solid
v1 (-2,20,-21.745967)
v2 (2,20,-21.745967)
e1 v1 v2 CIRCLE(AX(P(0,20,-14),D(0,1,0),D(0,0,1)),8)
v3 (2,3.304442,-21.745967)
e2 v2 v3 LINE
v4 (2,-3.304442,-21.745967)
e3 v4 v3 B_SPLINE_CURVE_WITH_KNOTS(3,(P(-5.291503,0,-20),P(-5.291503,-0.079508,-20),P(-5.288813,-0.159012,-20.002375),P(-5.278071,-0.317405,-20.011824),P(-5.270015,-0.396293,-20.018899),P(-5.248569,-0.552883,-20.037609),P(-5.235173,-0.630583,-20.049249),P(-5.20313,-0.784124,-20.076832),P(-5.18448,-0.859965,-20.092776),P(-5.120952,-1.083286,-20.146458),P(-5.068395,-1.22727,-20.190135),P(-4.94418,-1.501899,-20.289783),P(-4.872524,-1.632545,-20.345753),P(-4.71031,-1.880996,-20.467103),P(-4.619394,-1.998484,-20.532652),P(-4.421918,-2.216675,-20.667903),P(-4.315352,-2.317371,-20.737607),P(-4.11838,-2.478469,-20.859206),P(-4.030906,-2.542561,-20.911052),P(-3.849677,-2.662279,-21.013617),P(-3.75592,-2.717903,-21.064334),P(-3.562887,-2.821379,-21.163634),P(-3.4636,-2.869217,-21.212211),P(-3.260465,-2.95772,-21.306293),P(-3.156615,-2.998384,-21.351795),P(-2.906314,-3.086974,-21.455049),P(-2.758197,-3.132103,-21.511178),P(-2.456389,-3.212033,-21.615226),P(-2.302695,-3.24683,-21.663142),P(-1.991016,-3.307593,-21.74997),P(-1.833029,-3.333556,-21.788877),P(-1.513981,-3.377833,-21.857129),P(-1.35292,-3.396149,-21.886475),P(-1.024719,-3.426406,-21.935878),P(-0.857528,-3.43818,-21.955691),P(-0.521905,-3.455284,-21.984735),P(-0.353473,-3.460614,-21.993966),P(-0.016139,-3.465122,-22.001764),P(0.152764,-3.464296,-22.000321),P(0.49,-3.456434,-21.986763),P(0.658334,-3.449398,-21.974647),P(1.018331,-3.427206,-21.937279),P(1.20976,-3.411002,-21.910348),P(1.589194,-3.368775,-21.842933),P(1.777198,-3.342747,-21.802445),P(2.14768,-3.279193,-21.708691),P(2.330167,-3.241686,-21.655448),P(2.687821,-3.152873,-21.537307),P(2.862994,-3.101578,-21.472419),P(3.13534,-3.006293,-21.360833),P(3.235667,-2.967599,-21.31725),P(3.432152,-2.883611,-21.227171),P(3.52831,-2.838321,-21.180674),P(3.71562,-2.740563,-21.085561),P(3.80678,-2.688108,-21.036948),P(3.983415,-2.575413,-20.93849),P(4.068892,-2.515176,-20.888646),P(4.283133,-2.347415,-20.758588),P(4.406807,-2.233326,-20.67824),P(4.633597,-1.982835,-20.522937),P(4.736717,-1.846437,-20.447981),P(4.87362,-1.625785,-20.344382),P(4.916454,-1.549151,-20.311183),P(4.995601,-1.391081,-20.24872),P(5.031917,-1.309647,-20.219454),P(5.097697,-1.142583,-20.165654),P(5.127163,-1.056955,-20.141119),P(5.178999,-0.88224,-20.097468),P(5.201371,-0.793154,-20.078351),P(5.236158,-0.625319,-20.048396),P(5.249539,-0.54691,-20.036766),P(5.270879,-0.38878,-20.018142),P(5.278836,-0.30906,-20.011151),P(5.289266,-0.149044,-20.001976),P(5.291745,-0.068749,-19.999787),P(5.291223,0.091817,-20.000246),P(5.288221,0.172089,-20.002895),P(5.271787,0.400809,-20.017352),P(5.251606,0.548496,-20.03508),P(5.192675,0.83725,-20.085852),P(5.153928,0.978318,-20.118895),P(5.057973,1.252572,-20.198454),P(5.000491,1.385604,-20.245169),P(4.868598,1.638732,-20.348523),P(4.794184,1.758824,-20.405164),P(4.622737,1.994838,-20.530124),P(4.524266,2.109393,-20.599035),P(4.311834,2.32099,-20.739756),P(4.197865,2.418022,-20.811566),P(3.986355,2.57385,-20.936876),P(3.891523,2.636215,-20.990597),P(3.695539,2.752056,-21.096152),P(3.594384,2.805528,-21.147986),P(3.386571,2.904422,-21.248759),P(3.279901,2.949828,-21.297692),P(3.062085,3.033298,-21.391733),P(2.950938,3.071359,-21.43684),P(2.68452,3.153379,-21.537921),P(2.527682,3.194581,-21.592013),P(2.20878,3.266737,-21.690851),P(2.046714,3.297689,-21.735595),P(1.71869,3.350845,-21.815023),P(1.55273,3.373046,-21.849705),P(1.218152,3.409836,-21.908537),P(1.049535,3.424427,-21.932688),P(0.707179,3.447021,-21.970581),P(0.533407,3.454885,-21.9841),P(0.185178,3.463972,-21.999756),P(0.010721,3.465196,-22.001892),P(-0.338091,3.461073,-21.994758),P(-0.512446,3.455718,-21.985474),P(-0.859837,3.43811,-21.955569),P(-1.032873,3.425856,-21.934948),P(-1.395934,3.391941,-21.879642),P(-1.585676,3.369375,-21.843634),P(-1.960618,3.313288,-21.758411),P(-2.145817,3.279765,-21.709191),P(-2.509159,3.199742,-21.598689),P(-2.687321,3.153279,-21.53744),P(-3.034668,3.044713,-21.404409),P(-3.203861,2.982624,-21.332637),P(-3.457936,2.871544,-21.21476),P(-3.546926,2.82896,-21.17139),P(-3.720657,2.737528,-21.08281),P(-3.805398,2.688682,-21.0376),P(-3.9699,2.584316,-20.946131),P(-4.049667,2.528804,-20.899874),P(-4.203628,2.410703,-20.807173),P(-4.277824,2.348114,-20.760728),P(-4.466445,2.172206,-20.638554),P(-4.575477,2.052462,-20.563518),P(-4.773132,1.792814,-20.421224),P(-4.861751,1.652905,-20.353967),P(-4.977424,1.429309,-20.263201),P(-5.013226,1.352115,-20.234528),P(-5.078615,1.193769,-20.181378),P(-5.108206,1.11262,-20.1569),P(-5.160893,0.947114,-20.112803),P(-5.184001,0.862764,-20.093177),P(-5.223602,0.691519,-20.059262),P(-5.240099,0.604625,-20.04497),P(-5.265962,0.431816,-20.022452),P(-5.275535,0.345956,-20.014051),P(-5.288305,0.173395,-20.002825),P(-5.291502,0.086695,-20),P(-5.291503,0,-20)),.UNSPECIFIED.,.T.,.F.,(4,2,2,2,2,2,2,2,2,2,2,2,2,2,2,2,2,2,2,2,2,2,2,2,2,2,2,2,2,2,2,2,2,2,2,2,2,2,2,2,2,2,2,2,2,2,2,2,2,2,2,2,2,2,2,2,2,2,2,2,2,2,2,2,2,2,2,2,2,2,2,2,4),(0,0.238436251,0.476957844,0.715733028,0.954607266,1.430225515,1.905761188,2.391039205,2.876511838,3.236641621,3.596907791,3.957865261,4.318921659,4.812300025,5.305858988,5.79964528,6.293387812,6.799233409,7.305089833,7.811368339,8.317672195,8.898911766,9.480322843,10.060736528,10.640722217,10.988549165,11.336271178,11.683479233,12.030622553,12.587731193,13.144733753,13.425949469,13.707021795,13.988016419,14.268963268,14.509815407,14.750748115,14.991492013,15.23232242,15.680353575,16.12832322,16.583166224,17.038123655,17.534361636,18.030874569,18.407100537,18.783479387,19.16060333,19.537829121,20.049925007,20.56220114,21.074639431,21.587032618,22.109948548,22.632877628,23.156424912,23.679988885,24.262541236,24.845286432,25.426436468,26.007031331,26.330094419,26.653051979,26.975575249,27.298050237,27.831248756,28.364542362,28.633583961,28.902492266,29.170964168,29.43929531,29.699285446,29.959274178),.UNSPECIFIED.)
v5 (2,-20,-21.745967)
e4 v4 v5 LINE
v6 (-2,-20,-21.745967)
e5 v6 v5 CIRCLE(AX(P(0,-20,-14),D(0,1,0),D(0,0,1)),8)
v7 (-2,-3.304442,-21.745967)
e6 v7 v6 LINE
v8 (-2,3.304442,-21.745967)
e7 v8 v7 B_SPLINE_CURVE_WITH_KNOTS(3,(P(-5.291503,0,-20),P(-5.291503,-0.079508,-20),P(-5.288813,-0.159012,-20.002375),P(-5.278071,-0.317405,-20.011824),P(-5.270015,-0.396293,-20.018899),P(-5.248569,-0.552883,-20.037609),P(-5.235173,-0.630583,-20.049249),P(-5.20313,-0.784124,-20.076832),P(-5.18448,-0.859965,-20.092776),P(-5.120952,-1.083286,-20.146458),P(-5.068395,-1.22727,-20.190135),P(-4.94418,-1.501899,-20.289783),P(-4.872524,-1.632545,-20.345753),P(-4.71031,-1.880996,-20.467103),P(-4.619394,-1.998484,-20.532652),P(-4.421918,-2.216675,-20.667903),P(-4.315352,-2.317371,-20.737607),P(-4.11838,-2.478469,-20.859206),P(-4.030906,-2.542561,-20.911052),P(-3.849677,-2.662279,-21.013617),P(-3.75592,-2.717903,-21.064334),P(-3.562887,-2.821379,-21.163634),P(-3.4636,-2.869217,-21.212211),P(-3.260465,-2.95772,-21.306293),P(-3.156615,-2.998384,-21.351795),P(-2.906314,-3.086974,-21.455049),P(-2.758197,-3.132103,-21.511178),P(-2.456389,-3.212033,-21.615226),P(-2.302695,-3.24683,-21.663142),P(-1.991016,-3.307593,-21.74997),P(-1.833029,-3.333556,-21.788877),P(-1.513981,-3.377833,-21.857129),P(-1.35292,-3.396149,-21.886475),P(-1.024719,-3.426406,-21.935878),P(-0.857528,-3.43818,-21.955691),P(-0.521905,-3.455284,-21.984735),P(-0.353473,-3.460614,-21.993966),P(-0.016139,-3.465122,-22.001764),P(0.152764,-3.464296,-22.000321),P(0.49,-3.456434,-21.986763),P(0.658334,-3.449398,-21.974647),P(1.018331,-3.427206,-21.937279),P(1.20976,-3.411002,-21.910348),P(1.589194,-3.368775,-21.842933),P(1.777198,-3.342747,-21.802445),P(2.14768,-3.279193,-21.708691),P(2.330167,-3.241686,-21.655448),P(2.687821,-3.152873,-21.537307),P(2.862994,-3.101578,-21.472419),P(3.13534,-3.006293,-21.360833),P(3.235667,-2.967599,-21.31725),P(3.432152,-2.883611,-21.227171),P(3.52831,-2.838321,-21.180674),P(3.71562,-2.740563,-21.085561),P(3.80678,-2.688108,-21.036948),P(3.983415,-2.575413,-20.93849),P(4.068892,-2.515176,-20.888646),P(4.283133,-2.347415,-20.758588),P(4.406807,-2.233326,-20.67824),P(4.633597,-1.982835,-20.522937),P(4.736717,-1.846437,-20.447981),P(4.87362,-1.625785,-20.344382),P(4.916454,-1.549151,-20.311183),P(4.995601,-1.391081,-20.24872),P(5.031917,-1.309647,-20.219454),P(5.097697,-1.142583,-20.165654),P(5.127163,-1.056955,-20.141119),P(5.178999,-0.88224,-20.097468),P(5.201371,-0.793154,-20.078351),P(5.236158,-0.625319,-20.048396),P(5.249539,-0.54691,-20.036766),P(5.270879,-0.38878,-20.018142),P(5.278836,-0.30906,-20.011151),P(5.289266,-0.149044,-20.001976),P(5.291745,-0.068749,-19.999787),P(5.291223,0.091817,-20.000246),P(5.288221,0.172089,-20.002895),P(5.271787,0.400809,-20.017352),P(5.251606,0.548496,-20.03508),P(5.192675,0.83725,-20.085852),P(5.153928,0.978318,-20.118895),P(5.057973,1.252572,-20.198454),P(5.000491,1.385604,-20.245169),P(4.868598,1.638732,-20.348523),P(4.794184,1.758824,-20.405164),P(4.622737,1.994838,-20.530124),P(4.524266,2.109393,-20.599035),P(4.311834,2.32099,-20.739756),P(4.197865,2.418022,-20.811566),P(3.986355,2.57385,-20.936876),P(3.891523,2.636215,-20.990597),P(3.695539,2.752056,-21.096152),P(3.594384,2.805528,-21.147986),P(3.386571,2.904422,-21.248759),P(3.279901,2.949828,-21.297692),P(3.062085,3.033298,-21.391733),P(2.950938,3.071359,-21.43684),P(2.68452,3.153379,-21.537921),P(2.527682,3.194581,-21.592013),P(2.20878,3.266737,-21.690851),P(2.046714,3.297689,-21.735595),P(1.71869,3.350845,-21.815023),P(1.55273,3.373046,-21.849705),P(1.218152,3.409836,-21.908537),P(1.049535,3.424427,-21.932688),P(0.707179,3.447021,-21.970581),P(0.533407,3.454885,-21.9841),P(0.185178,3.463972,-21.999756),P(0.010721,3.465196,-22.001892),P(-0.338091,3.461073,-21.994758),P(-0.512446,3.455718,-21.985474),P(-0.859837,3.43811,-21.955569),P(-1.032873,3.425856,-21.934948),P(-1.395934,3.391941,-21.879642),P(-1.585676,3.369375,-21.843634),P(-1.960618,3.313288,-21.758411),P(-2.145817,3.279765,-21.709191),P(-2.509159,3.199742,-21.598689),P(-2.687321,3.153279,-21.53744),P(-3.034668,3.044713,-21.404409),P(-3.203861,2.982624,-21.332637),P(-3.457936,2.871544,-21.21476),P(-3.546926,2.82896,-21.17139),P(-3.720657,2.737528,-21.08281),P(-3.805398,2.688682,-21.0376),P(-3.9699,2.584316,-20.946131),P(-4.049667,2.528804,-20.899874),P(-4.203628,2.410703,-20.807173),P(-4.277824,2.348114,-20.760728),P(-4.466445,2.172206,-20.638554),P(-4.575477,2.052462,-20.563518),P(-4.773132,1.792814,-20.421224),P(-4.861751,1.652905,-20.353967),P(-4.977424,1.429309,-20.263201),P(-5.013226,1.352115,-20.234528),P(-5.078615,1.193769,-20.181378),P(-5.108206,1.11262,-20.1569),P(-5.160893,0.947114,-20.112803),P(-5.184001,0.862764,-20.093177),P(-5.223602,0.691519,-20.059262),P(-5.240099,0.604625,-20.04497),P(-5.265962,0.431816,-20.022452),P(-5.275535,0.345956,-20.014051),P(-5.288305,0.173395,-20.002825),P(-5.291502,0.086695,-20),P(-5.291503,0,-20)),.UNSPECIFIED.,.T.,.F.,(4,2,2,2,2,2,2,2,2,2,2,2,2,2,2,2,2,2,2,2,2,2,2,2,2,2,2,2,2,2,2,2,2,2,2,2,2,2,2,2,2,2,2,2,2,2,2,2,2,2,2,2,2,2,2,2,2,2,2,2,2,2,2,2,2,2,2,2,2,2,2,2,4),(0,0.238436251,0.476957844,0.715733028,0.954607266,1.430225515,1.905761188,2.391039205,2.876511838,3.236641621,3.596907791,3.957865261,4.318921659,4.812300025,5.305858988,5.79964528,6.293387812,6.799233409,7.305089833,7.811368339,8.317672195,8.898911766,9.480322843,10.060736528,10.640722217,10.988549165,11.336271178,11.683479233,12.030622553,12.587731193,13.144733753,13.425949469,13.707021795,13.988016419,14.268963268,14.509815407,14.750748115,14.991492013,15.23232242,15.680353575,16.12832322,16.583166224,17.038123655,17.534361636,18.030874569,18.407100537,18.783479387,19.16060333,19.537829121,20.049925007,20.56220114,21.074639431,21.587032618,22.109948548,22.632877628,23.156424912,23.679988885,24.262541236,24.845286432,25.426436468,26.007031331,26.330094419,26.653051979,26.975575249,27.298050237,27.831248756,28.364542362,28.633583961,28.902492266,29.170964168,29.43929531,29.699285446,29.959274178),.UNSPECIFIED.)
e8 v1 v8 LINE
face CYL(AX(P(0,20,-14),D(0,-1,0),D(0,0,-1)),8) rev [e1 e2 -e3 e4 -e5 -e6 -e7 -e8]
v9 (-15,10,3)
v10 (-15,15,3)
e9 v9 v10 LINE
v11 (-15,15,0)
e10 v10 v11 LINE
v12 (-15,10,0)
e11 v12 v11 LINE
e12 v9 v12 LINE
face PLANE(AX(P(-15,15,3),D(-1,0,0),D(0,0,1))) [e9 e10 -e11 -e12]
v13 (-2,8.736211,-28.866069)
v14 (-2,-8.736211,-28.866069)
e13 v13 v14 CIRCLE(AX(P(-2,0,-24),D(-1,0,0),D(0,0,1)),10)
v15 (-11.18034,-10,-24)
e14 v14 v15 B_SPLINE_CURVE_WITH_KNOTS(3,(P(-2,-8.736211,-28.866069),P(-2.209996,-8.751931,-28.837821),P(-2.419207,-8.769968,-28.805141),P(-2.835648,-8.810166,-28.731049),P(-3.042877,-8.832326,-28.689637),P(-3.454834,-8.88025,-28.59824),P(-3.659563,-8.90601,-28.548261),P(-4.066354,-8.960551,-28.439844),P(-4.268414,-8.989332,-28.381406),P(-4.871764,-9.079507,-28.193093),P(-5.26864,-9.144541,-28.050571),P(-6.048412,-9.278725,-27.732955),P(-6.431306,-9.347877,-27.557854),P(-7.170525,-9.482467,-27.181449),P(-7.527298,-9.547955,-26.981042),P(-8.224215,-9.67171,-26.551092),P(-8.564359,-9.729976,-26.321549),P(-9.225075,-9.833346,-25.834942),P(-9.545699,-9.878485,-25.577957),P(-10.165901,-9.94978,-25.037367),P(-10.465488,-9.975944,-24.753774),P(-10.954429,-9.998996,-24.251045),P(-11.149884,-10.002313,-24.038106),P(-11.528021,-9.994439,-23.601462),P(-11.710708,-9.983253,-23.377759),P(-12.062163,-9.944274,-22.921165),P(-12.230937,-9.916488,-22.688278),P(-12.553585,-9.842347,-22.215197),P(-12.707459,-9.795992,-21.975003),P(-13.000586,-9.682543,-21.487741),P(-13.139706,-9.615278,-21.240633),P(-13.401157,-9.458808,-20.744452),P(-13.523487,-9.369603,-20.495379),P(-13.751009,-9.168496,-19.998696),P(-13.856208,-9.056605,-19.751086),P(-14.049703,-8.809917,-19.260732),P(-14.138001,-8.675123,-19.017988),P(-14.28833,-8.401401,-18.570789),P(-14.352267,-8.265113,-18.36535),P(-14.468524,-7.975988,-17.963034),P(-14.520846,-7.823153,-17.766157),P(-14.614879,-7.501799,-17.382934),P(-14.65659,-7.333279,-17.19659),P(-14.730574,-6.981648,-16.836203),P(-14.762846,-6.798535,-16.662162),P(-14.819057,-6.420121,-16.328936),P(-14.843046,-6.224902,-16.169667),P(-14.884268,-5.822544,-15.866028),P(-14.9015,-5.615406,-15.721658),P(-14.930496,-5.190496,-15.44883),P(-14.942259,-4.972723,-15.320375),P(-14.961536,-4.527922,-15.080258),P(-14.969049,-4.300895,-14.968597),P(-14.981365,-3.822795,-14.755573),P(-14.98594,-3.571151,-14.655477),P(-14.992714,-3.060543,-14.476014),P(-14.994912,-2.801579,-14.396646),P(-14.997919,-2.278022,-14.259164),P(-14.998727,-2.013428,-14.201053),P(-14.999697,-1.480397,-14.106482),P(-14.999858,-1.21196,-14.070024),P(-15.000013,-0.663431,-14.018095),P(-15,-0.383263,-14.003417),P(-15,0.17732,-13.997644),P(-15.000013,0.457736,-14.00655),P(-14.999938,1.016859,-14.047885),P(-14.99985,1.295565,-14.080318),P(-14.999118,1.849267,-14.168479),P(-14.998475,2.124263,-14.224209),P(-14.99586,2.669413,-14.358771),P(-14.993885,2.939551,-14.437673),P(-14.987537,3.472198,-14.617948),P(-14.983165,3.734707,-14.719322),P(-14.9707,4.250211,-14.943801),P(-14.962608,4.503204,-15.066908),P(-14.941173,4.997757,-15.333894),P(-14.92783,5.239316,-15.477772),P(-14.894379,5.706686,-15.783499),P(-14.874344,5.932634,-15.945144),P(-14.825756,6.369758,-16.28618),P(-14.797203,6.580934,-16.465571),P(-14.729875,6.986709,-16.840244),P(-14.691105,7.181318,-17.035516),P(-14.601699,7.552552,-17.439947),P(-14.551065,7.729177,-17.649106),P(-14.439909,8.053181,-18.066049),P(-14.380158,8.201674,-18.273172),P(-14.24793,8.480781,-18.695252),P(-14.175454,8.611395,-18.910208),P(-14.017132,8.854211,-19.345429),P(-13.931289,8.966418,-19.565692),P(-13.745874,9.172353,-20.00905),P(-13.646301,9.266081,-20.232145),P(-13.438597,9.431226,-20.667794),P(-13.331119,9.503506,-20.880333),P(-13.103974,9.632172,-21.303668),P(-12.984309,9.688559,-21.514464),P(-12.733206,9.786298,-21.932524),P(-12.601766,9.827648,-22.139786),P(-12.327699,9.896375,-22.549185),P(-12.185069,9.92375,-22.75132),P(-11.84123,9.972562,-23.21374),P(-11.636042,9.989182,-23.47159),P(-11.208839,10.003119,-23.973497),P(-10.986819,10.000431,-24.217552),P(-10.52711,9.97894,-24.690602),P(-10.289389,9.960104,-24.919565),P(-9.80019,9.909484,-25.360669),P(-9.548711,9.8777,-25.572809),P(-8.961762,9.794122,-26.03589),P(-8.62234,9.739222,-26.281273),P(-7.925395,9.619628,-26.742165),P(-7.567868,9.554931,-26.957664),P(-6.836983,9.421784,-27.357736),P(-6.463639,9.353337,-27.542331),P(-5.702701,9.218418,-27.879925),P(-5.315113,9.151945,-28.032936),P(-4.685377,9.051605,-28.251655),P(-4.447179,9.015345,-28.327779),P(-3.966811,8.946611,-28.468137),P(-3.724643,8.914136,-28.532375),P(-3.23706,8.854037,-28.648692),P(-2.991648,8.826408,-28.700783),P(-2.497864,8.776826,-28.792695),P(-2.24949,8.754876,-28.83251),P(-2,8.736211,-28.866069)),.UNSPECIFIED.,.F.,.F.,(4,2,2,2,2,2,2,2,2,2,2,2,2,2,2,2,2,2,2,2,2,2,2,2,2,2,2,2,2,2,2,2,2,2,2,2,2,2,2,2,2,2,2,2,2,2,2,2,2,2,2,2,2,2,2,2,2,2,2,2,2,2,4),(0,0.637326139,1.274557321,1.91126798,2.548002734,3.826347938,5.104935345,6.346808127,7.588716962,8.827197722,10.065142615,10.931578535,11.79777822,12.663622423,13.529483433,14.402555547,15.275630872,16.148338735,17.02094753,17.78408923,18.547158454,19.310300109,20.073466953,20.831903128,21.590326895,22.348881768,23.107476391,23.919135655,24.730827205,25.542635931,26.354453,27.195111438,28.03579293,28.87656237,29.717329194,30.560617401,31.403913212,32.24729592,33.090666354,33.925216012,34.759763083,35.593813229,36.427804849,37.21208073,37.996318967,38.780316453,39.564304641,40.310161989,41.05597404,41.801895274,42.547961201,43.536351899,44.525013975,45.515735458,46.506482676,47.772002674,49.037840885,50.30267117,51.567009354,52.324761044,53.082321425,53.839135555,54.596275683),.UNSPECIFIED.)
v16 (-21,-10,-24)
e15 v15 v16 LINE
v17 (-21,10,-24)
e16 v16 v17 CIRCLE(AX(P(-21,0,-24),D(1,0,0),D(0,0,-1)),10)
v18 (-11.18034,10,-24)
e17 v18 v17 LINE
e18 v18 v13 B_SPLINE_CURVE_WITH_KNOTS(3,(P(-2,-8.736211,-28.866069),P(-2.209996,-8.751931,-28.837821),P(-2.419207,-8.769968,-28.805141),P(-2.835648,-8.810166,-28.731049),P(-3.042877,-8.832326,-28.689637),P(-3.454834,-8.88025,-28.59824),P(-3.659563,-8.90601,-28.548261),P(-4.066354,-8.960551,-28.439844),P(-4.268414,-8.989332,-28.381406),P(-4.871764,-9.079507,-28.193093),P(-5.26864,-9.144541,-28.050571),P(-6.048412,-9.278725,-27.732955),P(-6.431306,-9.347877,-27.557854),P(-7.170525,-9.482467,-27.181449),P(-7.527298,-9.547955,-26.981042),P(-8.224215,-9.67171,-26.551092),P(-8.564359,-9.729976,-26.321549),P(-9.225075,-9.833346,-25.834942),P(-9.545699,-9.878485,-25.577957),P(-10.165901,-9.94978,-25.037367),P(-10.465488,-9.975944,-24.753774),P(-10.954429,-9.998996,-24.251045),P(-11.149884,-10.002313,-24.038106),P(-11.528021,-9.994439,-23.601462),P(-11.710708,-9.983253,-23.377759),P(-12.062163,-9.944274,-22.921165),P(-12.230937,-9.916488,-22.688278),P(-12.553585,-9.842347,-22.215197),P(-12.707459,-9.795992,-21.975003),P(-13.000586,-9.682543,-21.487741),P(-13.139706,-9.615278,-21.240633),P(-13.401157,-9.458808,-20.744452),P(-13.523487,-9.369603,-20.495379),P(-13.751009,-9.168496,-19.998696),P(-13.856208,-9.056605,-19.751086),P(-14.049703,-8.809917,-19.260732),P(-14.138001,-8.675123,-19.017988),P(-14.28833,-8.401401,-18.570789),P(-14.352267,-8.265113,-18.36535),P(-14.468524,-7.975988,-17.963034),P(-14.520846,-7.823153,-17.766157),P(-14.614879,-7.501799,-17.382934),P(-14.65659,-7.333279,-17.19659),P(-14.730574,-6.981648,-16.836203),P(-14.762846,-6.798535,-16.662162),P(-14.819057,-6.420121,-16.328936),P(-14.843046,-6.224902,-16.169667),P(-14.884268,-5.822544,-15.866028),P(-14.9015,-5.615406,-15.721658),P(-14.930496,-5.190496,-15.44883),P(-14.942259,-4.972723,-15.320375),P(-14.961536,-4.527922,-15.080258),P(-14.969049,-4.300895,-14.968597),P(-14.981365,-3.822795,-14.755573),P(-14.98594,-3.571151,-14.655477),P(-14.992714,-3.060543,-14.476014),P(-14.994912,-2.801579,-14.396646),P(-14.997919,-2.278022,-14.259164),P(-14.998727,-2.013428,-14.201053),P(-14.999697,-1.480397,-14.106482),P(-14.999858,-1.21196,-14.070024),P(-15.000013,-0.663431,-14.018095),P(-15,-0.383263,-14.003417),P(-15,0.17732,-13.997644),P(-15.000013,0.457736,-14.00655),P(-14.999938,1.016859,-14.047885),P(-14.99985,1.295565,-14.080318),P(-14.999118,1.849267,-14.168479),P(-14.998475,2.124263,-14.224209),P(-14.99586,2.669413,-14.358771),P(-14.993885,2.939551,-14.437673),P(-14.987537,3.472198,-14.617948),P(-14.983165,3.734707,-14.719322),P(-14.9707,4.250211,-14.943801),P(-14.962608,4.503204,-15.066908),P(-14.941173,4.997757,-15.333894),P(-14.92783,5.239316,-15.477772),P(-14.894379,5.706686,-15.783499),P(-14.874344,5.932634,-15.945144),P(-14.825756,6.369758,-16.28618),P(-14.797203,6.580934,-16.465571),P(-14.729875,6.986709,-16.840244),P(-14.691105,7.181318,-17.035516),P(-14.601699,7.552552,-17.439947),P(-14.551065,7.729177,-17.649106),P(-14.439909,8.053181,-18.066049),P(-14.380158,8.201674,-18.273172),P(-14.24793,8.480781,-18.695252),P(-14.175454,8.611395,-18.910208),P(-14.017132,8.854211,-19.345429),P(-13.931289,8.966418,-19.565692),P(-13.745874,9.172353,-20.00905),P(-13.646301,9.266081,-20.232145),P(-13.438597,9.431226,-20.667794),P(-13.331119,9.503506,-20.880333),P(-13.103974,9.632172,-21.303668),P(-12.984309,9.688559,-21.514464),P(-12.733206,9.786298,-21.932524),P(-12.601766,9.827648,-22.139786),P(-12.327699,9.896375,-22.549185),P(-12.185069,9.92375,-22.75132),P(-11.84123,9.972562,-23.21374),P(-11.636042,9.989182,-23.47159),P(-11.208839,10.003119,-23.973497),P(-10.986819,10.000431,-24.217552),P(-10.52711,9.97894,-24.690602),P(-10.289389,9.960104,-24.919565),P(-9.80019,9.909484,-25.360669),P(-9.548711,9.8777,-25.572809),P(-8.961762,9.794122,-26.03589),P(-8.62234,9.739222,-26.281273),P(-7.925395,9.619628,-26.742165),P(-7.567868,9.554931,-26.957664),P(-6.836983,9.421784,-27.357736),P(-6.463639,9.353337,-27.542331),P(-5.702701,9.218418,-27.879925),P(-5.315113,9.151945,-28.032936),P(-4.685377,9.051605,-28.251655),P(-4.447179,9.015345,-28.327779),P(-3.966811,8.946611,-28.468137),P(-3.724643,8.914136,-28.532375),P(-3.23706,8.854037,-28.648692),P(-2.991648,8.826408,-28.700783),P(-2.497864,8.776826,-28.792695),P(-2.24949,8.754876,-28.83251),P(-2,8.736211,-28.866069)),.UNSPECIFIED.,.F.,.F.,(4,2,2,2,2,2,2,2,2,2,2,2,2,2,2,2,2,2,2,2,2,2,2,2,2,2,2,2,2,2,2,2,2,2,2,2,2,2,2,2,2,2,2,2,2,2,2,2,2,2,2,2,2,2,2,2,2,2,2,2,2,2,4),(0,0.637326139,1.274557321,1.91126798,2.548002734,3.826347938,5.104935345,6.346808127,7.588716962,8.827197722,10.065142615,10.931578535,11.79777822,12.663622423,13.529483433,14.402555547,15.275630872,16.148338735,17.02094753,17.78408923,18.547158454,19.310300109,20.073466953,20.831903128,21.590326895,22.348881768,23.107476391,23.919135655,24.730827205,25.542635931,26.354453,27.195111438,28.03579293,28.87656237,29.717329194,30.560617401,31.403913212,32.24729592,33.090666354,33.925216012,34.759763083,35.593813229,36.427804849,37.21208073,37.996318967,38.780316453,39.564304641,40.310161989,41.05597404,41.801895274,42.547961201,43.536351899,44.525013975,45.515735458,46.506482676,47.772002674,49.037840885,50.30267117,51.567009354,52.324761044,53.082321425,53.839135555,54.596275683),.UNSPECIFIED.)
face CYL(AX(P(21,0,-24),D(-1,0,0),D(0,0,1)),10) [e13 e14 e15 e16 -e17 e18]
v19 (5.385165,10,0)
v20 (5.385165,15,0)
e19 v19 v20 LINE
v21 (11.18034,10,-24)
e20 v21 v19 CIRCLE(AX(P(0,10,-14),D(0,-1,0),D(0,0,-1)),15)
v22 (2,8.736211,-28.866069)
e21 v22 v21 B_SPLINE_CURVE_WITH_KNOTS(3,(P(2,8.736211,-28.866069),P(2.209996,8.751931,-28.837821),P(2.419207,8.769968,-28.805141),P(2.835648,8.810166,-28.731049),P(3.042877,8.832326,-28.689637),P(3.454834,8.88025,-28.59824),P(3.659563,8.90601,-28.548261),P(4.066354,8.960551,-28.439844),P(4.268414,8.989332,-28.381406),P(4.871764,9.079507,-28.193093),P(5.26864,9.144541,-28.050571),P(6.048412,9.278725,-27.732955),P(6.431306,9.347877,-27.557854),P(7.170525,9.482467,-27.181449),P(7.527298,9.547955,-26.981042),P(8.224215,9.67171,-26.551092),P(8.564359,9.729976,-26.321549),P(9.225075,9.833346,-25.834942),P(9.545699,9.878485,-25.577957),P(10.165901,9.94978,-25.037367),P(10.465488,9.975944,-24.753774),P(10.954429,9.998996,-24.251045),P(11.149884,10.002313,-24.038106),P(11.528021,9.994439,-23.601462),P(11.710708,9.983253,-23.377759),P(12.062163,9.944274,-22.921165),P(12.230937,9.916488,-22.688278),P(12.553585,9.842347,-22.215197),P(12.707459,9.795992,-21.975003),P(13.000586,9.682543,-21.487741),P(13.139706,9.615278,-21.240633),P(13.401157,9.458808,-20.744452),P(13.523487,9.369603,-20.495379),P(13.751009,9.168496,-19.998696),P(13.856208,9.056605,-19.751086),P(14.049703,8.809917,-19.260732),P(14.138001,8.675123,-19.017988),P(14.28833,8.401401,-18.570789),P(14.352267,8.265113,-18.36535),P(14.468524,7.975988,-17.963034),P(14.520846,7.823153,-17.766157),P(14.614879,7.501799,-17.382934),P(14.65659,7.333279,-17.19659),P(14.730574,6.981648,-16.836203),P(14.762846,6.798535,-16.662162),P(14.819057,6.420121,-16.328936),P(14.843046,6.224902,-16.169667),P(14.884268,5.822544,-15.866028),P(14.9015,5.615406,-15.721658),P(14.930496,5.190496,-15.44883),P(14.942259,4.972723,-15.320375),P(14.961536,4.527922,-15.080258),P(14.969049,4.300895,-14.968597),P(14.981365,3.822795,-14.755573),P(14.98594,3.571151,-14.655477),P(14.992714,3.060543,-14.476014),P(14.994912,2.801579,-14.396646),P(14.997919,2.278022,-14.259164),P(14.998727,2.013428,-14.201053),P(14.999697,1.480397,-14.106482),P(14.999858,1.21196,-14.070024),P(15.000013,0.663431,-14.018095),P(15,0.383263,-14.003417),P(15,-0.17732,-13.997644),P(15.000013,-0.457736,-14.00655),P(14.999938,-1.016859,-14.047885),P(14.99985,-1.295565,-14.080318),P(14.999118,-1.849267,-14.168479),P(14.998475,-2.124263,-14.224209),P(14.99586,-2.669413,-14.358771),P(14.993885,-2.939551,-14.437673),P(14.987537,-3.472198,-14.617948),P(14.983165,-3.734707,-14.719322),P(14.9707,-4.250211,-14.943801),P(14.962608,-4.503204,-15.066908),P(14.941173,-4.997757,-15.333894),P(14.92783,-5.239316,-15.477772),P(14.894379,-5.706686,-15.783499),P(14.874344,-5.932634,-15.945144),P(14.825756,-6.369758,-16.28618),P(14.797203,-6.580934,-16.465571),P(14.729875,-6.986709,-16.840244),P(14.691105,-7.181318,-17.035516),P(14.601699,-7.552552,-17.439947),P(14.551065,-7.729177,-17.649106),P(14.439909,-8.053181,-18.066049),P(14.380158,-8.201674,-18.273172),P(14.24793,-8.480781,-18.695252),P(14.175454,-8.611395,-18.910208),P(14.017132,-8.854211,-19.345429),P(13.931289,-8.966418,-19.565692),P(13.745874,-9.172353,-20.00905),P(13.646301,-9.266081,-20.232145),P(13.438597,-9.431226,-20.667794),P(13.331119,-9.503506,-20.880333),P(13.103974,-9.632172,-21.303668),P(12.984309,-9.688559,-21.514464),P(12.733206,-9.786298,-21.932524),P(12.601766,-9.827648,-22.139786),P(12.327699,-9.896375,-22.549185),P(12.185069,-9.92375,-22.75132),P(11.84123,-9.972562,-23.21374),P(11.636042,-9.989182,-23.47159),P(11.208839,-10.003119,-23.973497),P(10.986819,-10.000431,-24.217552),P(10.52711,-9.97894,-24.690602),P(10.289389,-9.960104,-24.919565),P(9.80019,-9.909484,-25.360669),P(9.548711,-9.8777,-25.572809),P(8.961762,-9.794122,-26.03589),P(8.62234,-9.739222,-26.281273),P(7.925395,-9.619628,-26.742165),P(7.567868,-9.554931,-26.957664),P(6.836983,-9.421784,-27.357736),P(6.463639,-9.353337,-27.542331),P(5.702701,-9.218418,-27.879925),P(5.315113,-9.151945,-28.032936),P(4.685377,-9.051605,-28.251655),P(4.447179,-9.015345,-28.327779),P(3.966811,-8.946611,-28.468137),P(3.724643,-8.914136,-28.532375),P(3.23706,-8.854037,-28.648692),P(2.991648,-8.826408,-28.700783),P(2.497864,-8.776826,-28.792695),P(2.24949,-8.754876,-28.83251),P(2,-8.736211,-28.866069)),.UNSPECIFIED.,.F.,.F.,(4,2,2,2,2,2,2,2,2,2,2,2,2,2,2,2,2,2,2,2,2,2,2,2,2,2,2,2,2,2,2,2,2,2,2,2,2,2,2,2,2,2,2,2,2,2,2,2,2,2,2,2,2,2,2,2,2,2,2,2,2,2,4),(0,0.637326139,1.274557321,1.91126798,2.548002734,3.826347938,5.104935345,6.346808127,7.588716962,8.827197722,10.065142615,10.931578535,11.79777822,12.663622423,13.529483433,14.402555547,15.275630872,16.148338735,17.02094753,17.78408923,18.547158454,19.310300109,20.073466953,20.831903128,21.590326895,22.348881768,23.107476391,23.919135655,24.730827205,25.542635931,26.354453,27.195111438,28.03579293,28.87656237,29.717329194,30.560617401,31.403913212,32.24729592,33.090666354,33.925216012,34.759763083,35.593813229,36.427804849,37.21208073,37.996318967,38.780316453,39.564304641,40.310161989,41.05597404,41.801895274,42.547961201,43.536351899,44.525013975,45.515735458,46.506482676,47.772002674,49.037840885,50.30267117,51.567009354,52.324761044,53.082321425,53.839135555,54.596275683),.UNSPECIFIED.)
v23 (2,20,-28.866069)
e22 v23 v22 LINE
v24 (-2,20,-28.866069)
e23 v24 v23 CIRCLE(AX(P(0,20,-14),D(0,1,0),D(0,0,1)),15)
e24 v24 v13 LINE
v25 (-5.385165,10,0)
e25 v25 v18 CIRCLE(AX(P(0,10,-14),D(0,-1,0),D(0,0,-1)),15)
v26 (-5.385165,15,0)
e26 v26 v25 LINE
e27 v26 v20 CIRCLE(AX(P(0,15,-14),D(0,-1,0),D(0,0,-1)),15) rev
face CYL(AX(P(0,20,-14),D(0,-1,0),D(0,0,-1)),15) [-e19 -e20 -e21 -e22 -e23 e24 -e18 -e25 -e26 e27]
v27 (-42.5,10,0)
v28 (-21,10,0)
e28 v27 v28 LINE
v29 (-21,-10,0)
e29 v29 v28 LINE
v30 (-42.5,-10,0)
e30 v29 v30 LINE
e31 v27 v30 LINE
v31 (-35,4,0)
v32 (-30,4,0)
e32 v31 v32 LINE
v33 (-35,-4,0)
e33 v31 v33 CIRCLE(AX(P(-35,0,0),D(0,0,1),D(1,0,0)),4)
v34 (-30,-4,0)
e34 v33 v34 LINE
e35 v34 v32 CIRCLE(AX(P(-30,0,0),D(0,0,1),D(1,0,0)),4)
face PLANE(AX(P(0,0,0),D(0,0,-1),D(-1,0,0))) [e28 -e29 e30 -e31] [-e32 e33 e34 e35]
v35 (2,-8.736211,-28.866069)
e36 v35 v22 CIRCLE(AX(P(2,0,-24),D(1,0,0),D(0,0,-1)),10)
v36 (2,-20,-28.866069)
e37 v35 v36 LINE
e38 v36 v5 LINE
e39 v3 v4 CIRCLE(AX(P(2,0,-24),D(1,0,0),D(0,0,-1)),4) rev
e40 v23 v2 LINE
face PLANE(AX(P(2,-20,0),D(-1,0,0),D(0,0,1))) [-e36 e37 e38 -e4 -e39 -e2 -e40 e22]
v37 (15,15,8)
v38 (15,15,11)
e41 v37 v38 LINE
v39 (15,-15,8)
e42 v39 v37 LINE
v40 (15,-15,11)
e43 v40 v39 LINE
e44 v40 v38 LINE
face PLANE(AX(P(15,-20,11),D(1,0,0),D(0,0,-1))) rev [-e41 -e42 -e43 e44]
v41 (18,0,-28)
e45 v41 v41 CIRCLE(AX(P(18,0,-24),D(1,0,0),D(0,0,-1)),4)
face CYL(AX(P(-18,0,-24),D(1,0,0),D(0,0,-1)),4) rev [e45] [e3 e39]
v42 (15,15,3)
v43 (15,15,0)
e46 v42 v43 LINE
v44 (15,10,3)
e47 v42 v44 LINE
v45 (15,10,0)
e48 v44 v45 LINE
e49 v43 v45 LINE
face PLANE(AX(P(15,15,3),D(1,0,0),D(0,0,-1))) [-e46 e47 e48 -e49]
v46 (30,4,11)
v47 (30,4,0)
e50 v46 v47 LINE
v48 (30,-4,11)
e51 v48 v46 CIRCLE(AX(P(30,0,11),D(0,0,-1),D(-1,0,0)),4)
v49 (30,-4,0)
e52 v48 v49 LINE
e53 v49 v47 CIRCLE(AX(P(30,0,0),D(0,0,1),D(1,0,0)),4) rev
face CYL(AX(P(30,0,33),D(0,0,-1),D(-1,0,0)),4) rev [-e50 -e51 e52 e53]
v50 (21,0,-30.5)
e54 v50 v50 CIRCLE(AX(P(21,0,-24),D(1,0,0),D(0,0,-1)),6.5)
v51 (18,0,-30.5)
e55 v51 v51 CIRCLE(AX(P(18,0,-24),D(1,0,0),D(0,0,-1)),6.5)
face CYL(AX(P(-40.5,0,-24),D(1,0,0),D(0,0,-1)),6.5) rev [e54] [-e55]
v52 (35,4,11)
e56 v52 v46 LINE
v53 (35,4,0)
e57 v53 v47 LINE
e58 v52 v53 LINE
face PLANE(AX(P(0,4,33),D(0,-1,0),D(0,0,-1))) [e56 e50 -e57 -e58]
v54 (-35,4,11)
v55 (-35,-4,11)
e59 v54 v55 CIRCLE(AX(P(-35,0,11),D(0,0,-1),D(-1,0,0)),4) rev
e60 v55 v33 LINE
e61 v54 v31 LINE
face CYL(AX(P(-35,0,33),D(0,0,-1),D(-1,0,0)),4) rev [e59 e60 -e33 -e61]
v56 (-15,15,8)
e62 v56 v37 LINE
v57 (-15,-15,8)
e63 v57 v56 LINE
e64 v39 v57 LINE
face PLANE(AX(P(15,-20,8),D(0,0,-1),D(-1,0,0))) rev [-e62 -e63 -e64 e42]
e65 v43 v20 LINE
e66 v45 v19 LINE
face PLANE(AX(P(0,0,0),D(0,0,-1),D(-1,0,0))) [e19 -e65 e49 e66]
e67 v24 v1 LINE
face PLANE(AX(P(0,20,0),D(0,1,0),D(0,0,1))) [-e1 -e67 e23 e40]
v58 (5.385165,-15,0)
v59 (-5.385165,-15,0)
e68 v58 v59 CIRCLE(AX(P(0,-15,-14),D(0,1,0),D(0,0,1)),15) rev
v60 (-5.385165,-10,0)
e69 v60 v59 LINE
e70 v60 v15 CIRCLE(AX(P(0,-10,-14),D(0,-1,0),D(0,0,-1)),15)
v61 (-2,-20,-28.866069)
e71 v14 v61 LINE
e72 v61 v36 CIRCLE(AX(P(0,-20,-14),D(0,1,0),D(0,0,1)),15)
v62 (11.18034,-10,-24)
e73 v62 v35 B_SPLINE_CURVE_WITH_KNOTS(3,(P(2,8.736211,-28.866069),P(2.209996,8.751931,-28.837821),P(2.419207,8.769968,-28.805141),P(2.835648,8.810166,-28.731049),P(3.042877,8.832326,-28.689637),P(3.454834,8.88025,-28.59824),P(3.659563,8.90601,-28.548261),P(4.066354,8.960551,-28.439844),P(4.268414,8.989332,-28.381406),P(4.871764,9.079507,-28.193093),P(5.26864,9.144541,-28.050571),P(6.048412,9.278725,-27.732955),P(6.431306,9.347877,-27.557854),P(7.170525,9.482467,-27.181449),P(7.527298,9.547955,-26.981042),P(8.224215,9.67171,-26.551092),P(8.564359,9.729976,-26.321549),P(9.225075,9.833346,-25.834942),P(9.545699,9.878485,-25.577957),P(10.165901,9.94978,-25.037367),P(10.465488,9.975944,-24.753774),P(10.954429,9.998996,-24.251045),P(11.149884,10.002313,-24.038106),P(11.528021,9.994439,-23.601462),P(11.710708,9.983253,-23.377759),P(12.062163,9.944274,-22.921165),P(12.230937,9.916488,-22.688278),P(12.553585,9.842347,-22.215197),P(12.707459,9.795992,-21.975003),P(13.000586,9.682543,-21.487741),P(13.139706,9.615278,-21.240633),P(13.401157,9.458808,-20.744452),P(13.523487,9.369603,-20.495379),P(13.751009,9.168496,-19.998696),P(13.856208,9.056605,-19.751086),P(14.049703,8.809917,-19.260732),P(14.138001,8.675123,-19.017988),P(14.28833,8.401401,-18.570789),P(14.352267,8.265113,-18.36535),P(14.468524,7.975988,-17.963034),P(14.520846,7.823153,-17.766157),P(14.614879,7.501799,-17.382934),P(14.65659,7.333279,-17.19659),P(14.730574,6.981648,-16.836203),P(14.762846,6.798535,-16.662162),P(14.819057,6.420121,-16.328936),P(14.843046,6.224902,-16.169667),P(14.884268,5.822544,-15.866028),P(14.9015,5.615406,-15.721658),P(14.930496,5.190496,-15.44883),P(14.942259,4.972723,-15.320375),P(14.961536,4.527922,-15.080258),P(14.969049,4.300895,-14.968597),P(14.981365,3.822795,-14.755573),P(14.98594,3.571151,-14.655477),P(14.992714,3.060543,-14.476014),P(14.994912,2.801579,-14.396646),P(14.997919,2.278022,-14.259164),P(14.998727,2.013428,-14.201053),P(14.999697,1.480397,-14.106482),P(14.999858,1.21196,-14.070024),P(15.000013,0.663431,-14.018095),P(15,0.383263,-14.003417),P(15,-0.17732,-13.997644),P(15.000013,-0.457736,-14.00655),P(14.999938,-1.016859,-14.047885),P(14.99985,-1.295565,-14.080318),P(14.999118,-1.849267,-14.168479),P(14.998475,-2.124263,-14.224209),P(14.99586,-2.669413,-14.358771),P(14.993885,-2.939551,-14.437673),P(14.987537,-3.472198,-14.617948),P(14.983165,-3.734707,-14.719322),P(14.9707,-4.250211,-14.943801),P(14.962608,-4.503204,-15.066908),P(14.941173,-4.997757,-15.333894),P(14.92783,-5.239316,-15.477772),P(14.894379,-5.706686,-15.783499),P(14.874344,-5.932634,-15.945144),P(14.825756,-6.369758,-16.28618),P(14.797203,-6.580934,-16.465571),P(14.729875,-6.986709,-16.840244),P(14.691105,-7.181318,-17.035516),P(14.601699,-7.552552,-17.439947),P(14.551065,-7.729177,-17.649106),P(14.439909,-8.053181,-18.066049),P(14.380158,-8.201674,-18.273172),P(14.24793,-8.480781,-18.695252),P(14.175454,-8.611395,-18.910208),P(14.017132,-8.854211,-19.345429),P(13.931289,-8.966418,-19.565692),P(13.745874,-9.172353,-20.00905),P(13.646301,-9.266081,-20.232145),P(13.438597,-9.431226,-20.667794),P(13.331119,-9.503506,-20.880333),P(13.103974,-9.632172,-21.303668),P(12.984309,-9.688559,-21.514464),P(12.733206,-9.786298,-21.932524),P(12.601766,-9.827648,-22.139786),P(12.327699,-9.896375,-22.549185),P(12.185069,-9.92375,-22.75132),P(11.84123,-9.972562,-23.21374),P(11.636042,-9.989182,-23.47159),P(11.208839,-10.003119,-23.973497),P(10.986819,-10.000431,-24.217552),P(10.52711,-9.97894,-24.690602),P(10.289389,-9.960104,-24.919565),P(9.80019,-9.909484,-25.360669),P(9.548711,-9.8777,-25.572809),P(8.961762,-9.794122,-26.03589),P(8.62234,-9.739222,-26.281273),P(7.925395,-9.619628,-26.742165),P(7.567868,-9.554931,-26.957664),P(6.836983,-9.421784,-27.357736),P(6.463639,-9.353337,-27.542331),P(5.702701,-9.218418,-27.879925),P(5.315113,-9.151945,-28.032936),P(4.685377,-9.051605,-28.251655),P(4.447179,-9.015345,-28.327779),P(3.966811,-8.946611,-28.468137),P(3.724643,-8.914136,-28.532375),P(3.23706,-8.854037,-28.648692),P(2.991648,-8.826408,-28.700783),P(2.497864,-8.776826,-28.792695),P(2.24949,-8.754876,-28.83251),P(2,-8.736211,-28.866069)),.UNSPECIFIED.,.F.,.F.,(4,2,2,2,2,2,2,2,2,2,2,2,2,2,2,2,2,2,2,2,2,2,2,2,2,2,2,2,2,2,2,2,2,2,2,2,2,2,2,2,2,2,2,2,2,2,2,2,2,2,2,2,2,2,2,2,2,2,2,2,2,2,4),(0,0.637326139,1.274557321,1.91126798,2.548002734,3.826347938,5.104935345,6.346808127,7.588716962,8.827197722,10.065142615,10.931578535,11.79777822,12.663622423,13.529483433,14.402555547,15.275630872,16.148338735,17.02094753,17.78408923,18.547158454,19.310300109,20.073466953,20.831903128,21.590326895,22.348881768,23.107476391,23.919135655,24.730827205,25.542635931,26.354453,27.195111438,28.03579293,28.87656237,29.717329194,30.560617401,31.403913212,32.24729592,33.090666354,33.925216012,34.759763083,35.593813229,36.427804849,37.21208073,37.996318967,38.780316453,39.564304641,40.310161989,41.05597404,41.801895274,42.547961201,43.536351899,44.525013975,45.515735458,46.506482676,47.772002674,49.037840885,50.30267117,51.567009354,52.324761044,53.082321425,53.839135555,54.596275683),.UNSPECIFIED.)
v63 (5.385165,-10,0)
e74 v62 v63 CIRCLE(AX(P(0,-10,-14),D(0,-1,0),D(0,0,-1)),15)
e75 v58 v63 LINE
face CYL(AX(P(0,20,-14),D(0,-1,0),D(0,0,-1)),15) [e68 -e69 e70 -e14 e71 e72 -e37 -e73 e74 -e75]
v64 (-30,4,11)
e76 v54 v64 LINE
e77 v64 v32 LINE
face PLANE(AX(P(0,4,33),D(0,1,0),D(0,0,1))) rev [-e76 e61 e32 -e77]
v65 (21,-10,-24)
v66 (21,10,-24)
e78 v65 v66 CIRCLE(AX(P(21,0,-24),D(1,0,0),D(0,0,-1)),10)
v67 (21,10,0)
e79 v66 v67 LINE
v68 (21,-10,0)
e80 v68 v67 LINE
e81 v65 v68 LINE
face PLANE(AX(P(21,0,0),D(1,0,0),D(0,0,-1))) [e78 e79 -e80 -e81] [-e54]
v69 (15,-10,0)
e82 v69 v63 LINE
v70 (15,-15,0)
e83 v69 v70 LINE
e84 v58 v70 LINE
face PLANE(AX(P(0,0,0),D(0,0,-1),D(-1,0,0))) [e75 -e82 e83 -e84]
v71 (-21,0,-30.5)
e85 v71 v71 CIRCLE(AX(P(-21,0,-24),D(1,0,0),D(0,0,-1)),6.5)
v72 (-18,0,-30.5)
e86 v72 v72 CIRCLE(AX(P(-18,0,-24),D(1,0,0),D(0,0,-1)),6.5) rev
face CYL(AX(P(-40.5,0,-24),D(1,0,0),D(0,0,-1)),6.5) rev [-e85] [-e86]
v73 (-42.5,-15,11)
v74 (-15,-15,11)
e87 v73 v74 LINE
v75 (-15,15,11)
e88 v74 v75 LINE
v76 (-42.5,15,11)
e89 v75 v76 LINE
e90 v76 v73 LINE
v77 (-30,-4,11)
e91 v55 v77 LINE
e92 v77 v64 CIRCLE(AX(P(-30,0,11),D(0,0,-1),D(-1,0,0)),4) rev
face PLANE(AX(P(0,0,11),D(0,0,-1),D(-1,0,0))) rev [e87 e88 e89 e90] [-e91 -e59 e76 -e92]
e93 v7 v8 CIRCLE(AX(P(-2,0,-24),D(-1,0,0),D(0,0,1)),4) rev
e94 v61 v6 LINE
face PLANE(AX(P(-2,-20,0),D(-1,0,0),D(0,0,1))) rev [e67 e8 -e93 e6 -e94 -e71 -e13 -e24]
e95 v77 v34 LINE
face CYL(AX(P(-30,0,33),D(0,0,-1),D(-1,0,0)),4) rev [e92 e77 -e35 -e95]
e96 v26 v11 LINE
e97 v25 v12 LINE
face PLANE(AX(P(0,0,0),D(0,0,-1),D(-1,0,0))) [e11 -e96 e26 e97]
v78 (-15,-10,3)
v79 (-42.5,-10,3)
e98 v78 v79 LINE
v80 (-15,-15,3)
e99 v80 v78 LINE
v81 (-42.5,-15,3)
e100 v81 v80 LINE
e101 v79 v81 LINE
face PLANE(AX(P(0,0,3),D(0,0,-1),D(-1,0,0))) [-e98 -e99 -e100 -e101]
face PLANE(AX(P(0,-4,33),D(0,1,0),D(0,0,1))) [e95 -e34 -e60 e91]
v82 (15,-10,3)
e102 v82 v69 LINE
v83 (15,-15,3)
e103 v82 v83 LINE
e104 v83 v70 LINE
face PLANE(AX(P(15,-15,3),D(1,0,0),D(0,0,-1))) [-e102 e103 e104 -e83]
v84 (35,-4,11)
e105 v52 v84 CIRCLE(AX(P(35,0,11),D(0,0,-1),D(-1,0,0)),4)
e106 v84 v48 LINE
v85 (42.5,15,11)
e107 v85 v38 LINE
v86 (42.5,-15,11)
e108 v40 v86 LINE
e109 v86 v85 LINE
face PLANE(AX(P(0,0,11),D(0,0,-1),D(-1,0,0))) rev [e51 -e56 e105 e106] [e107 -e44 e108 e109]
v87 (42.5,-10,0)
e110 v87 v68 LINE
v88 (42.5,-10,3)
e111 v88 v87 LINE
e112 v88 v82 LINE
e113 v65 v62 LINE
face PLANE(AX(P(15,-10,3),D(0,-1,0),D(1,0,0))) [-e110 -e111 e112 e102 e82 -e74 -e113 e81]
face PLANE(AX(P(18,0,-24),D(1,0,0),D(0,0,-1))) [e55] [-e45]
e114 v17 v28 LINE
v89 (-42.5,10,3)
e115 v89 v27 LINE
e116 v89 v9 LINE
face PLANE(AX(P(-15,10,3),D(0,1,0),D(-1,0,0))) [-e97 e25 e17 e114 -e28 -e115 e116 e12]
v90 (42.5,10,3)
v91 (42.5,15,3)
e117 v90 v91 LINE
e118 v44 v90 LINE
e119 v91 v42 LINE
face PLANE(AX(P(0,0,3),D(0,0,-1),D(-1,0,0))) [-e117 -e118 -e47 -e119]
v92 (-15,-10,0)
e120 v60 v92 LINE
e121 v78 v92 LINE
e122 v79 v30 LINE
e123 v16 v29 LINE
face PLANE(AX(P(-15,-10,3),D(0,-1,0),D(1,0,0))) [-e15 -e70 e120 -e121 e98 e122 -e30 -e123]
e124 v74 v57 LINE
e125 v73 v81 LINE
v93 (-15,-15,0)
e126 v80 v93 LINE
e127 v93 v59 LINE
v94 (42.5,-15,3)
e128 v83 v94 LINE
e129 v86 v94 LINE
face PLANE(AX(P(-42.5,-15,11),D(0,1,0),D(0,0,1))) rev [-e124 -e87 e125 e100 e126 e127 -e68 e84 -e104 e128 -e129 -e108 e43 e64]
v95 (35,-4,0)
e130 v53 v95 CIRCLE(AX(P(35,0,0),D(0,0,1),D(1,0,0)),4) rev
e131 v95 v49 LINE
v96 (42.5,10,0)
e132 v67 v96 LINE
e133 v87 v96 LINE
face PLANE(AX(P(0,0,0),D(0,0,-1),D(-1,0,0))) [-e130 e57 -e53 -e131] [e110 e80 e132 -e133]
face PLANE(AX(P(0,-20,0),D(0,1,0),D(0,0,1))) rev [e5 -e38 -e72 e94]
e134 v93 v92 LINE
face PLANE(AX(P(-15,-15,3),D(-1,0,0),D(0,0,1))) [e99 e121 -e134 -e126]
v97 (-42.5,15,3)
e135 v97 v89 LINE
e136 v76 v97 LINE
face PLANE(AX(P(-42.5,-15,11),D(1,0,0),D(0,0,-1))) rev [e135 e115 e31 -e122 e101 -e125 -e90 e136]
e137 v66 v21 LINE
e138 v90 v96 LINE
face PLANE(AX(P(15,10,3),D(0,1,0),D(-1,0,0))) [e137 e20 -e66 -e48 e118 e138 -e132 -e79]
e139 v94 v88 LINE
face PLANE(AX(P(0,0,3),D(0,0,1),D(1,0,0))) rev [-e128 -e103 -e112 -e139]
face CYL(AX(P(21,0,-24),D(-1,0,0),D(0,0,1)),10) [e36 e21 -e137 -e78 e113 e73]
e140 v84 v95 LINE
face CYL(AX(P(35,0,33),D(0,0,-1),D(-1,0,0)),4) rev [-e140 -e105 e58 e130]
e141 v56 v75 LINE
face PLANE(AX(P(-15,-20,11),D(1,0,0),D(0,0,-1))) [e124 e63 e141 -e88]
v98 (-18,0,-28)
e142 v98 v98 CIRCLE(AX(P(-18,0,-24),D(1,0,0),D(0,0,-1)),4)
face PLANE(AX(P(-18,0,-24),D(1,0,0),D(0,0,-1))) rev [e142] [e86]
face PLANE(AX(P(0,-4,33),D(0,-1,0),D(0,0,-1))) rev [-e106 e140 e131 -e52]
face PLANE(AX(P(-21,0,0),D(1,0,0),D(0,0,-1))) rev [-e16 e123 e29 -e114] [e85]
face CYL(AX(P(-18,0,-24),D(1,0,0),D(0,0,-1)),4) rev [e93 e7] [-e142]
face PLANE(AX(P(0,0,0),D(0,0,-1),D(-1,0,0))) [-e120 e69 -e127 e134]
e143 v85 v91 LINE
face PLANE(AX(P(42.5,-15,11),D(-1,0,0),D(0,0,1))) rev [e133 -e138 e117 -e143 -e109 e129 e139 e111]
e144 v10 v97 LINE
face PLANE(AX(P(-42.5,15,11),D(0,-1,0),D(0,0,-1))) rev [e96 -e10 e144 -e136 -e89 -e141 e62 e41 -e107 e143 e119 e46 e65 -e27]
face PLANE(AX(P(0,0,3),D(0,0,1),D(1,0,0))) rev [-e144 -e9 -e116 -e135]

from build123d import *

# Parameters (mm, degrees)
SKETCH_1_W                = 85
SKETCH_1_H                = 30
EXTRUDE_1_DEPTH           = 11
SKETCH_2_W                = 27.5
SKETCH_2_H                = 5
CUT_EXTRUDE_3_DEPTH       = 3
CUT_EXTRUDE_5_DEPTH       = 33
EXTRUDE_6_DEPTH           = 20
CUT_EXTRUDE_6_DEPTH       = 20
SKETCH_10_R               = 4
EXTRUDE_7_DEPTH           = 21
SKETCH_11_R               = 6.5
CUT_EXTRUDE_9_DEPTH       = 40.5
SKETCH_13_R               = 6.5
EXTRUDE_8_DEPTH           = 18
SKETCH_14_R               = 4
CUT_EXTRUDE_10_DEPTH      = 18
SKETCH_15_R               = 8
CUT_EXTRUDE_11_DEPTH      = 18
CUT_EXTRUDE_12_DEPTH      = 18
CUT_EXTRUDE_13_DEPTH      = 58.984912
CUT_EXTRUDE_13_DEPTH_BACK = 58.984912
SKETCH_19_W               = 30
SKETCH_19_H               = 3


with BuildPart() as part:
    # 草图1 → 凸台-拉伸1 (new body)
    with BuildSketch(Plane.XY):
        Rectangle(SKETCH_1_W, SKETCH_1_H)
    extrude(amount=EXTRUDE_1_DEPTH)

    # 草图2 → 切除-拉伸3 (cut)
    with BuildSketch(Plane.XY):
        with Locations((-28.75, 12.5)):
            Rectangle(SKETCH_2_W, SKETCH_2_H)
        with Locations((28.75, 12.5)):
            Rectangle(SKETCH_2_W, SKETCH_2_H)
        with Locations((28.75, -12.5)):
            Rectangle(SKETCH_2_W, SKETCH_2_H)
        with Locations((-28.75, -12.5)):
            Rectangle(SKETCH_2_W, SKETCH_2_H)
    extrude(amount=CUT_EXTRUDE_3_DEPTH, mode=Mode.SUBTRACT)

    # 草图6 → 切除-拉伸5 (cut)
    with BuildSketch(Plane.XY):
        with BuildLine():
            Line((-30, 4), (-35, 4))
            ThreePointArc((-35, 4), (-37.828427, 2.828427), (-39, 0))
            ThreePointArc((-39, 0), (-37.828427, -2.828427), (-35, -4))
            Line((-35, -4), (-30, -4))
            ThreePointArc((-30, -4), (-26, 0), (-30, 4))
        make_face()
        with BuildLine():
            ThreePointArc((39, 0), (37.828427, 2.828427), (35, 4))
            Line((35, 4), (30, 4))
            ThreePointArc((30, 4), (26, 0), (30, -4))
            Line((30, -4), (35, -4))
            ThreePointArc((35, -4), (37.828427, -2.828427), (39, 0))
        make_face()
    extrude(amount=CUT_EXTRUDE_5_DEPTH, mode=Mode.SUBTRACT)

    # 草图8 → 凸台-拉伸6 (add, symmetric)
    with BuildSketch(Plane(origin=(0, 0, 0), x_dir=(1, 0, 0), z_dir=(0, 1, 0))):
        with BuildLine():
            ThreePointArc((-5.385165, 0), (-2.738613, -0.747881), (0, -1))
            ThreePointArc((0, -1), (2.738613, -0.747881), (5.385165, 0))
            ThreePointArc((5.385165, 0), (12.364818, 5.508165), (15, 14))
            ThreePointArc((15, 14), (0, 29), (-15, 14))
            ThreePointArc((-15, 14), (-12.364818, 5.508165), (-5.385165, 0))
        make_face()
        with BuildLine():
            ThreePointArc((8, 14), (5.656854, 8.343146), (0, 6))
            ThreePointArc((0, 6), (-5.656854, 19.656854), (8, 14))
        make_face(mode=Mode.SUBTRACT)
    extrude(amount=EXTRUDE_6_DEPTH, both=True)

    # 草图9 → 切除-拉伸6 (cut, symmetric)
    with BuildSketch(Plane(origin=(0, 0, 0), x_dir=(1, 0, 0), z_dir=(0, 1, 0))):
        Polygon((2, 42.203899), (-2, 42.203899), (-2, 20.468656), (0, 20.468656), (2, 20.468656), align=None)
    extrude(amount=CUT_EXTRUDE_6_DEPTH, both=True, mode=Mode.SUBTRACT)

    # 草图10 → 凸台-拉伸7 (add, symmetric)
    with BuildSketch(Plane(origin=(0, 0, 0), x_dir=(0, 0, -1), z_dir=(1, 0, 0))):
        with BuildLine():
            Line((0, 10), (0, -10))
            Line((0, -10), (24, -10))
            ThreePointArc((24, -10), (34, 0), (24, 10))
            Line((24, 10), (0, 10))
        make_face()
        with Locations((24, 0)):
            Circle(SKETCH_10_R, mode=Mode.SUBTRACT)
    extrude(amount=EXTRUDE_7_DEPTH, both=True)

    # 草图11 → 切除-拉伸9 (cut, symmetric)
    with BuildSketch(Plane(origin=(0, 0, 0), x_dir=(0, 0, -1), z_dir=(1, 0, 0))):
        with Locations((24, 0)):
            Circle(SKETCH_11_R)
    extrude(amount=CUT_EXTRUDE_9_DEPTH, both=True, mode=Mode.SUBTRACT)

    # 草图13 → 凸台-拉伸8 (add, symmetric)
    with BuildSketch(Plane(origin=(0, 0, 0), x_dir=(0, 0, -1), z_dir=(1, 0, 0))):
        with Locations((24, 0)):
            Circle(SKETCH_13_R)
    extrude(amount=EXTRUDE_8_DEPTH, both=True)

    # 草图14 → 切除-拉伸10 (cut, symmetric)
    with BuildSketch(Plane(origin=(0, 0, 0), x_dir=(0, 0, -1), z_dir=(1, 0, 0))):
        with Locations((24, 0)):
            Circle(SKETCH_14_R)
    extrude(amount=CUT_EXTRUDE_10_DEPTH, both=True, mode=Mode.SUBTRACT)

    # 草图15 → 切除-拉伸11 (cut, symmetric)
    with BuildSketch(Plane(origin=(0, 0, 0), x_dir=(1, 0, 0), z_dir=(0, 1, 0))):
        with Locations((0, 14)):
            Circle(SKETCH_15_R)
    extrude(amount=CUT_EXTRUDE_11_DEPTH, both=True, mode=Mode.SUBTRACT)

    # 草图16 → 切除-拉伸12 (cut, symmetric)
    with BuildSketch(Plane(origin=(0, 0, 0), x_dir=(1, 0, 0), z_dir=(0, 1, 0))):
        with BuildLine():
            Line((-2, 34), (2, 34))
            Line((2, 34), (2, 21.745967))
            ThreePointArc((2, 21.745967), (0, 22), (-2, 21.745967))
            Line((-2, 21.745967), (-2, 34))
        make_face()
    extrude(amount=CUT_EXTRUDE_12_DEPTH, both=True, mode=Mode.SUBTRACT)

    # 草图19 → 切除-拉伸13 (cut, two sides: drawn at the far end of the back side and taken through both)
    with BuildSketch(Plane(origin=(0, 0, 0), x_dir=(1, 0, 0), z_dir=(0, 1, 0)).offset(-CUT_EXTRUDE_13_DEPTH_BACK)):
        with Locations((0, -9.5)):
            Rectangle(SKETCH_19_W, SKETCH_19_H)
    extrude(amount=CUT_EXTRUDE_13_DEPTH + CUT_EXTRUDE_13_DEPTH_BACK, mode=Mode.SUBTRACT)


solid = part.part
